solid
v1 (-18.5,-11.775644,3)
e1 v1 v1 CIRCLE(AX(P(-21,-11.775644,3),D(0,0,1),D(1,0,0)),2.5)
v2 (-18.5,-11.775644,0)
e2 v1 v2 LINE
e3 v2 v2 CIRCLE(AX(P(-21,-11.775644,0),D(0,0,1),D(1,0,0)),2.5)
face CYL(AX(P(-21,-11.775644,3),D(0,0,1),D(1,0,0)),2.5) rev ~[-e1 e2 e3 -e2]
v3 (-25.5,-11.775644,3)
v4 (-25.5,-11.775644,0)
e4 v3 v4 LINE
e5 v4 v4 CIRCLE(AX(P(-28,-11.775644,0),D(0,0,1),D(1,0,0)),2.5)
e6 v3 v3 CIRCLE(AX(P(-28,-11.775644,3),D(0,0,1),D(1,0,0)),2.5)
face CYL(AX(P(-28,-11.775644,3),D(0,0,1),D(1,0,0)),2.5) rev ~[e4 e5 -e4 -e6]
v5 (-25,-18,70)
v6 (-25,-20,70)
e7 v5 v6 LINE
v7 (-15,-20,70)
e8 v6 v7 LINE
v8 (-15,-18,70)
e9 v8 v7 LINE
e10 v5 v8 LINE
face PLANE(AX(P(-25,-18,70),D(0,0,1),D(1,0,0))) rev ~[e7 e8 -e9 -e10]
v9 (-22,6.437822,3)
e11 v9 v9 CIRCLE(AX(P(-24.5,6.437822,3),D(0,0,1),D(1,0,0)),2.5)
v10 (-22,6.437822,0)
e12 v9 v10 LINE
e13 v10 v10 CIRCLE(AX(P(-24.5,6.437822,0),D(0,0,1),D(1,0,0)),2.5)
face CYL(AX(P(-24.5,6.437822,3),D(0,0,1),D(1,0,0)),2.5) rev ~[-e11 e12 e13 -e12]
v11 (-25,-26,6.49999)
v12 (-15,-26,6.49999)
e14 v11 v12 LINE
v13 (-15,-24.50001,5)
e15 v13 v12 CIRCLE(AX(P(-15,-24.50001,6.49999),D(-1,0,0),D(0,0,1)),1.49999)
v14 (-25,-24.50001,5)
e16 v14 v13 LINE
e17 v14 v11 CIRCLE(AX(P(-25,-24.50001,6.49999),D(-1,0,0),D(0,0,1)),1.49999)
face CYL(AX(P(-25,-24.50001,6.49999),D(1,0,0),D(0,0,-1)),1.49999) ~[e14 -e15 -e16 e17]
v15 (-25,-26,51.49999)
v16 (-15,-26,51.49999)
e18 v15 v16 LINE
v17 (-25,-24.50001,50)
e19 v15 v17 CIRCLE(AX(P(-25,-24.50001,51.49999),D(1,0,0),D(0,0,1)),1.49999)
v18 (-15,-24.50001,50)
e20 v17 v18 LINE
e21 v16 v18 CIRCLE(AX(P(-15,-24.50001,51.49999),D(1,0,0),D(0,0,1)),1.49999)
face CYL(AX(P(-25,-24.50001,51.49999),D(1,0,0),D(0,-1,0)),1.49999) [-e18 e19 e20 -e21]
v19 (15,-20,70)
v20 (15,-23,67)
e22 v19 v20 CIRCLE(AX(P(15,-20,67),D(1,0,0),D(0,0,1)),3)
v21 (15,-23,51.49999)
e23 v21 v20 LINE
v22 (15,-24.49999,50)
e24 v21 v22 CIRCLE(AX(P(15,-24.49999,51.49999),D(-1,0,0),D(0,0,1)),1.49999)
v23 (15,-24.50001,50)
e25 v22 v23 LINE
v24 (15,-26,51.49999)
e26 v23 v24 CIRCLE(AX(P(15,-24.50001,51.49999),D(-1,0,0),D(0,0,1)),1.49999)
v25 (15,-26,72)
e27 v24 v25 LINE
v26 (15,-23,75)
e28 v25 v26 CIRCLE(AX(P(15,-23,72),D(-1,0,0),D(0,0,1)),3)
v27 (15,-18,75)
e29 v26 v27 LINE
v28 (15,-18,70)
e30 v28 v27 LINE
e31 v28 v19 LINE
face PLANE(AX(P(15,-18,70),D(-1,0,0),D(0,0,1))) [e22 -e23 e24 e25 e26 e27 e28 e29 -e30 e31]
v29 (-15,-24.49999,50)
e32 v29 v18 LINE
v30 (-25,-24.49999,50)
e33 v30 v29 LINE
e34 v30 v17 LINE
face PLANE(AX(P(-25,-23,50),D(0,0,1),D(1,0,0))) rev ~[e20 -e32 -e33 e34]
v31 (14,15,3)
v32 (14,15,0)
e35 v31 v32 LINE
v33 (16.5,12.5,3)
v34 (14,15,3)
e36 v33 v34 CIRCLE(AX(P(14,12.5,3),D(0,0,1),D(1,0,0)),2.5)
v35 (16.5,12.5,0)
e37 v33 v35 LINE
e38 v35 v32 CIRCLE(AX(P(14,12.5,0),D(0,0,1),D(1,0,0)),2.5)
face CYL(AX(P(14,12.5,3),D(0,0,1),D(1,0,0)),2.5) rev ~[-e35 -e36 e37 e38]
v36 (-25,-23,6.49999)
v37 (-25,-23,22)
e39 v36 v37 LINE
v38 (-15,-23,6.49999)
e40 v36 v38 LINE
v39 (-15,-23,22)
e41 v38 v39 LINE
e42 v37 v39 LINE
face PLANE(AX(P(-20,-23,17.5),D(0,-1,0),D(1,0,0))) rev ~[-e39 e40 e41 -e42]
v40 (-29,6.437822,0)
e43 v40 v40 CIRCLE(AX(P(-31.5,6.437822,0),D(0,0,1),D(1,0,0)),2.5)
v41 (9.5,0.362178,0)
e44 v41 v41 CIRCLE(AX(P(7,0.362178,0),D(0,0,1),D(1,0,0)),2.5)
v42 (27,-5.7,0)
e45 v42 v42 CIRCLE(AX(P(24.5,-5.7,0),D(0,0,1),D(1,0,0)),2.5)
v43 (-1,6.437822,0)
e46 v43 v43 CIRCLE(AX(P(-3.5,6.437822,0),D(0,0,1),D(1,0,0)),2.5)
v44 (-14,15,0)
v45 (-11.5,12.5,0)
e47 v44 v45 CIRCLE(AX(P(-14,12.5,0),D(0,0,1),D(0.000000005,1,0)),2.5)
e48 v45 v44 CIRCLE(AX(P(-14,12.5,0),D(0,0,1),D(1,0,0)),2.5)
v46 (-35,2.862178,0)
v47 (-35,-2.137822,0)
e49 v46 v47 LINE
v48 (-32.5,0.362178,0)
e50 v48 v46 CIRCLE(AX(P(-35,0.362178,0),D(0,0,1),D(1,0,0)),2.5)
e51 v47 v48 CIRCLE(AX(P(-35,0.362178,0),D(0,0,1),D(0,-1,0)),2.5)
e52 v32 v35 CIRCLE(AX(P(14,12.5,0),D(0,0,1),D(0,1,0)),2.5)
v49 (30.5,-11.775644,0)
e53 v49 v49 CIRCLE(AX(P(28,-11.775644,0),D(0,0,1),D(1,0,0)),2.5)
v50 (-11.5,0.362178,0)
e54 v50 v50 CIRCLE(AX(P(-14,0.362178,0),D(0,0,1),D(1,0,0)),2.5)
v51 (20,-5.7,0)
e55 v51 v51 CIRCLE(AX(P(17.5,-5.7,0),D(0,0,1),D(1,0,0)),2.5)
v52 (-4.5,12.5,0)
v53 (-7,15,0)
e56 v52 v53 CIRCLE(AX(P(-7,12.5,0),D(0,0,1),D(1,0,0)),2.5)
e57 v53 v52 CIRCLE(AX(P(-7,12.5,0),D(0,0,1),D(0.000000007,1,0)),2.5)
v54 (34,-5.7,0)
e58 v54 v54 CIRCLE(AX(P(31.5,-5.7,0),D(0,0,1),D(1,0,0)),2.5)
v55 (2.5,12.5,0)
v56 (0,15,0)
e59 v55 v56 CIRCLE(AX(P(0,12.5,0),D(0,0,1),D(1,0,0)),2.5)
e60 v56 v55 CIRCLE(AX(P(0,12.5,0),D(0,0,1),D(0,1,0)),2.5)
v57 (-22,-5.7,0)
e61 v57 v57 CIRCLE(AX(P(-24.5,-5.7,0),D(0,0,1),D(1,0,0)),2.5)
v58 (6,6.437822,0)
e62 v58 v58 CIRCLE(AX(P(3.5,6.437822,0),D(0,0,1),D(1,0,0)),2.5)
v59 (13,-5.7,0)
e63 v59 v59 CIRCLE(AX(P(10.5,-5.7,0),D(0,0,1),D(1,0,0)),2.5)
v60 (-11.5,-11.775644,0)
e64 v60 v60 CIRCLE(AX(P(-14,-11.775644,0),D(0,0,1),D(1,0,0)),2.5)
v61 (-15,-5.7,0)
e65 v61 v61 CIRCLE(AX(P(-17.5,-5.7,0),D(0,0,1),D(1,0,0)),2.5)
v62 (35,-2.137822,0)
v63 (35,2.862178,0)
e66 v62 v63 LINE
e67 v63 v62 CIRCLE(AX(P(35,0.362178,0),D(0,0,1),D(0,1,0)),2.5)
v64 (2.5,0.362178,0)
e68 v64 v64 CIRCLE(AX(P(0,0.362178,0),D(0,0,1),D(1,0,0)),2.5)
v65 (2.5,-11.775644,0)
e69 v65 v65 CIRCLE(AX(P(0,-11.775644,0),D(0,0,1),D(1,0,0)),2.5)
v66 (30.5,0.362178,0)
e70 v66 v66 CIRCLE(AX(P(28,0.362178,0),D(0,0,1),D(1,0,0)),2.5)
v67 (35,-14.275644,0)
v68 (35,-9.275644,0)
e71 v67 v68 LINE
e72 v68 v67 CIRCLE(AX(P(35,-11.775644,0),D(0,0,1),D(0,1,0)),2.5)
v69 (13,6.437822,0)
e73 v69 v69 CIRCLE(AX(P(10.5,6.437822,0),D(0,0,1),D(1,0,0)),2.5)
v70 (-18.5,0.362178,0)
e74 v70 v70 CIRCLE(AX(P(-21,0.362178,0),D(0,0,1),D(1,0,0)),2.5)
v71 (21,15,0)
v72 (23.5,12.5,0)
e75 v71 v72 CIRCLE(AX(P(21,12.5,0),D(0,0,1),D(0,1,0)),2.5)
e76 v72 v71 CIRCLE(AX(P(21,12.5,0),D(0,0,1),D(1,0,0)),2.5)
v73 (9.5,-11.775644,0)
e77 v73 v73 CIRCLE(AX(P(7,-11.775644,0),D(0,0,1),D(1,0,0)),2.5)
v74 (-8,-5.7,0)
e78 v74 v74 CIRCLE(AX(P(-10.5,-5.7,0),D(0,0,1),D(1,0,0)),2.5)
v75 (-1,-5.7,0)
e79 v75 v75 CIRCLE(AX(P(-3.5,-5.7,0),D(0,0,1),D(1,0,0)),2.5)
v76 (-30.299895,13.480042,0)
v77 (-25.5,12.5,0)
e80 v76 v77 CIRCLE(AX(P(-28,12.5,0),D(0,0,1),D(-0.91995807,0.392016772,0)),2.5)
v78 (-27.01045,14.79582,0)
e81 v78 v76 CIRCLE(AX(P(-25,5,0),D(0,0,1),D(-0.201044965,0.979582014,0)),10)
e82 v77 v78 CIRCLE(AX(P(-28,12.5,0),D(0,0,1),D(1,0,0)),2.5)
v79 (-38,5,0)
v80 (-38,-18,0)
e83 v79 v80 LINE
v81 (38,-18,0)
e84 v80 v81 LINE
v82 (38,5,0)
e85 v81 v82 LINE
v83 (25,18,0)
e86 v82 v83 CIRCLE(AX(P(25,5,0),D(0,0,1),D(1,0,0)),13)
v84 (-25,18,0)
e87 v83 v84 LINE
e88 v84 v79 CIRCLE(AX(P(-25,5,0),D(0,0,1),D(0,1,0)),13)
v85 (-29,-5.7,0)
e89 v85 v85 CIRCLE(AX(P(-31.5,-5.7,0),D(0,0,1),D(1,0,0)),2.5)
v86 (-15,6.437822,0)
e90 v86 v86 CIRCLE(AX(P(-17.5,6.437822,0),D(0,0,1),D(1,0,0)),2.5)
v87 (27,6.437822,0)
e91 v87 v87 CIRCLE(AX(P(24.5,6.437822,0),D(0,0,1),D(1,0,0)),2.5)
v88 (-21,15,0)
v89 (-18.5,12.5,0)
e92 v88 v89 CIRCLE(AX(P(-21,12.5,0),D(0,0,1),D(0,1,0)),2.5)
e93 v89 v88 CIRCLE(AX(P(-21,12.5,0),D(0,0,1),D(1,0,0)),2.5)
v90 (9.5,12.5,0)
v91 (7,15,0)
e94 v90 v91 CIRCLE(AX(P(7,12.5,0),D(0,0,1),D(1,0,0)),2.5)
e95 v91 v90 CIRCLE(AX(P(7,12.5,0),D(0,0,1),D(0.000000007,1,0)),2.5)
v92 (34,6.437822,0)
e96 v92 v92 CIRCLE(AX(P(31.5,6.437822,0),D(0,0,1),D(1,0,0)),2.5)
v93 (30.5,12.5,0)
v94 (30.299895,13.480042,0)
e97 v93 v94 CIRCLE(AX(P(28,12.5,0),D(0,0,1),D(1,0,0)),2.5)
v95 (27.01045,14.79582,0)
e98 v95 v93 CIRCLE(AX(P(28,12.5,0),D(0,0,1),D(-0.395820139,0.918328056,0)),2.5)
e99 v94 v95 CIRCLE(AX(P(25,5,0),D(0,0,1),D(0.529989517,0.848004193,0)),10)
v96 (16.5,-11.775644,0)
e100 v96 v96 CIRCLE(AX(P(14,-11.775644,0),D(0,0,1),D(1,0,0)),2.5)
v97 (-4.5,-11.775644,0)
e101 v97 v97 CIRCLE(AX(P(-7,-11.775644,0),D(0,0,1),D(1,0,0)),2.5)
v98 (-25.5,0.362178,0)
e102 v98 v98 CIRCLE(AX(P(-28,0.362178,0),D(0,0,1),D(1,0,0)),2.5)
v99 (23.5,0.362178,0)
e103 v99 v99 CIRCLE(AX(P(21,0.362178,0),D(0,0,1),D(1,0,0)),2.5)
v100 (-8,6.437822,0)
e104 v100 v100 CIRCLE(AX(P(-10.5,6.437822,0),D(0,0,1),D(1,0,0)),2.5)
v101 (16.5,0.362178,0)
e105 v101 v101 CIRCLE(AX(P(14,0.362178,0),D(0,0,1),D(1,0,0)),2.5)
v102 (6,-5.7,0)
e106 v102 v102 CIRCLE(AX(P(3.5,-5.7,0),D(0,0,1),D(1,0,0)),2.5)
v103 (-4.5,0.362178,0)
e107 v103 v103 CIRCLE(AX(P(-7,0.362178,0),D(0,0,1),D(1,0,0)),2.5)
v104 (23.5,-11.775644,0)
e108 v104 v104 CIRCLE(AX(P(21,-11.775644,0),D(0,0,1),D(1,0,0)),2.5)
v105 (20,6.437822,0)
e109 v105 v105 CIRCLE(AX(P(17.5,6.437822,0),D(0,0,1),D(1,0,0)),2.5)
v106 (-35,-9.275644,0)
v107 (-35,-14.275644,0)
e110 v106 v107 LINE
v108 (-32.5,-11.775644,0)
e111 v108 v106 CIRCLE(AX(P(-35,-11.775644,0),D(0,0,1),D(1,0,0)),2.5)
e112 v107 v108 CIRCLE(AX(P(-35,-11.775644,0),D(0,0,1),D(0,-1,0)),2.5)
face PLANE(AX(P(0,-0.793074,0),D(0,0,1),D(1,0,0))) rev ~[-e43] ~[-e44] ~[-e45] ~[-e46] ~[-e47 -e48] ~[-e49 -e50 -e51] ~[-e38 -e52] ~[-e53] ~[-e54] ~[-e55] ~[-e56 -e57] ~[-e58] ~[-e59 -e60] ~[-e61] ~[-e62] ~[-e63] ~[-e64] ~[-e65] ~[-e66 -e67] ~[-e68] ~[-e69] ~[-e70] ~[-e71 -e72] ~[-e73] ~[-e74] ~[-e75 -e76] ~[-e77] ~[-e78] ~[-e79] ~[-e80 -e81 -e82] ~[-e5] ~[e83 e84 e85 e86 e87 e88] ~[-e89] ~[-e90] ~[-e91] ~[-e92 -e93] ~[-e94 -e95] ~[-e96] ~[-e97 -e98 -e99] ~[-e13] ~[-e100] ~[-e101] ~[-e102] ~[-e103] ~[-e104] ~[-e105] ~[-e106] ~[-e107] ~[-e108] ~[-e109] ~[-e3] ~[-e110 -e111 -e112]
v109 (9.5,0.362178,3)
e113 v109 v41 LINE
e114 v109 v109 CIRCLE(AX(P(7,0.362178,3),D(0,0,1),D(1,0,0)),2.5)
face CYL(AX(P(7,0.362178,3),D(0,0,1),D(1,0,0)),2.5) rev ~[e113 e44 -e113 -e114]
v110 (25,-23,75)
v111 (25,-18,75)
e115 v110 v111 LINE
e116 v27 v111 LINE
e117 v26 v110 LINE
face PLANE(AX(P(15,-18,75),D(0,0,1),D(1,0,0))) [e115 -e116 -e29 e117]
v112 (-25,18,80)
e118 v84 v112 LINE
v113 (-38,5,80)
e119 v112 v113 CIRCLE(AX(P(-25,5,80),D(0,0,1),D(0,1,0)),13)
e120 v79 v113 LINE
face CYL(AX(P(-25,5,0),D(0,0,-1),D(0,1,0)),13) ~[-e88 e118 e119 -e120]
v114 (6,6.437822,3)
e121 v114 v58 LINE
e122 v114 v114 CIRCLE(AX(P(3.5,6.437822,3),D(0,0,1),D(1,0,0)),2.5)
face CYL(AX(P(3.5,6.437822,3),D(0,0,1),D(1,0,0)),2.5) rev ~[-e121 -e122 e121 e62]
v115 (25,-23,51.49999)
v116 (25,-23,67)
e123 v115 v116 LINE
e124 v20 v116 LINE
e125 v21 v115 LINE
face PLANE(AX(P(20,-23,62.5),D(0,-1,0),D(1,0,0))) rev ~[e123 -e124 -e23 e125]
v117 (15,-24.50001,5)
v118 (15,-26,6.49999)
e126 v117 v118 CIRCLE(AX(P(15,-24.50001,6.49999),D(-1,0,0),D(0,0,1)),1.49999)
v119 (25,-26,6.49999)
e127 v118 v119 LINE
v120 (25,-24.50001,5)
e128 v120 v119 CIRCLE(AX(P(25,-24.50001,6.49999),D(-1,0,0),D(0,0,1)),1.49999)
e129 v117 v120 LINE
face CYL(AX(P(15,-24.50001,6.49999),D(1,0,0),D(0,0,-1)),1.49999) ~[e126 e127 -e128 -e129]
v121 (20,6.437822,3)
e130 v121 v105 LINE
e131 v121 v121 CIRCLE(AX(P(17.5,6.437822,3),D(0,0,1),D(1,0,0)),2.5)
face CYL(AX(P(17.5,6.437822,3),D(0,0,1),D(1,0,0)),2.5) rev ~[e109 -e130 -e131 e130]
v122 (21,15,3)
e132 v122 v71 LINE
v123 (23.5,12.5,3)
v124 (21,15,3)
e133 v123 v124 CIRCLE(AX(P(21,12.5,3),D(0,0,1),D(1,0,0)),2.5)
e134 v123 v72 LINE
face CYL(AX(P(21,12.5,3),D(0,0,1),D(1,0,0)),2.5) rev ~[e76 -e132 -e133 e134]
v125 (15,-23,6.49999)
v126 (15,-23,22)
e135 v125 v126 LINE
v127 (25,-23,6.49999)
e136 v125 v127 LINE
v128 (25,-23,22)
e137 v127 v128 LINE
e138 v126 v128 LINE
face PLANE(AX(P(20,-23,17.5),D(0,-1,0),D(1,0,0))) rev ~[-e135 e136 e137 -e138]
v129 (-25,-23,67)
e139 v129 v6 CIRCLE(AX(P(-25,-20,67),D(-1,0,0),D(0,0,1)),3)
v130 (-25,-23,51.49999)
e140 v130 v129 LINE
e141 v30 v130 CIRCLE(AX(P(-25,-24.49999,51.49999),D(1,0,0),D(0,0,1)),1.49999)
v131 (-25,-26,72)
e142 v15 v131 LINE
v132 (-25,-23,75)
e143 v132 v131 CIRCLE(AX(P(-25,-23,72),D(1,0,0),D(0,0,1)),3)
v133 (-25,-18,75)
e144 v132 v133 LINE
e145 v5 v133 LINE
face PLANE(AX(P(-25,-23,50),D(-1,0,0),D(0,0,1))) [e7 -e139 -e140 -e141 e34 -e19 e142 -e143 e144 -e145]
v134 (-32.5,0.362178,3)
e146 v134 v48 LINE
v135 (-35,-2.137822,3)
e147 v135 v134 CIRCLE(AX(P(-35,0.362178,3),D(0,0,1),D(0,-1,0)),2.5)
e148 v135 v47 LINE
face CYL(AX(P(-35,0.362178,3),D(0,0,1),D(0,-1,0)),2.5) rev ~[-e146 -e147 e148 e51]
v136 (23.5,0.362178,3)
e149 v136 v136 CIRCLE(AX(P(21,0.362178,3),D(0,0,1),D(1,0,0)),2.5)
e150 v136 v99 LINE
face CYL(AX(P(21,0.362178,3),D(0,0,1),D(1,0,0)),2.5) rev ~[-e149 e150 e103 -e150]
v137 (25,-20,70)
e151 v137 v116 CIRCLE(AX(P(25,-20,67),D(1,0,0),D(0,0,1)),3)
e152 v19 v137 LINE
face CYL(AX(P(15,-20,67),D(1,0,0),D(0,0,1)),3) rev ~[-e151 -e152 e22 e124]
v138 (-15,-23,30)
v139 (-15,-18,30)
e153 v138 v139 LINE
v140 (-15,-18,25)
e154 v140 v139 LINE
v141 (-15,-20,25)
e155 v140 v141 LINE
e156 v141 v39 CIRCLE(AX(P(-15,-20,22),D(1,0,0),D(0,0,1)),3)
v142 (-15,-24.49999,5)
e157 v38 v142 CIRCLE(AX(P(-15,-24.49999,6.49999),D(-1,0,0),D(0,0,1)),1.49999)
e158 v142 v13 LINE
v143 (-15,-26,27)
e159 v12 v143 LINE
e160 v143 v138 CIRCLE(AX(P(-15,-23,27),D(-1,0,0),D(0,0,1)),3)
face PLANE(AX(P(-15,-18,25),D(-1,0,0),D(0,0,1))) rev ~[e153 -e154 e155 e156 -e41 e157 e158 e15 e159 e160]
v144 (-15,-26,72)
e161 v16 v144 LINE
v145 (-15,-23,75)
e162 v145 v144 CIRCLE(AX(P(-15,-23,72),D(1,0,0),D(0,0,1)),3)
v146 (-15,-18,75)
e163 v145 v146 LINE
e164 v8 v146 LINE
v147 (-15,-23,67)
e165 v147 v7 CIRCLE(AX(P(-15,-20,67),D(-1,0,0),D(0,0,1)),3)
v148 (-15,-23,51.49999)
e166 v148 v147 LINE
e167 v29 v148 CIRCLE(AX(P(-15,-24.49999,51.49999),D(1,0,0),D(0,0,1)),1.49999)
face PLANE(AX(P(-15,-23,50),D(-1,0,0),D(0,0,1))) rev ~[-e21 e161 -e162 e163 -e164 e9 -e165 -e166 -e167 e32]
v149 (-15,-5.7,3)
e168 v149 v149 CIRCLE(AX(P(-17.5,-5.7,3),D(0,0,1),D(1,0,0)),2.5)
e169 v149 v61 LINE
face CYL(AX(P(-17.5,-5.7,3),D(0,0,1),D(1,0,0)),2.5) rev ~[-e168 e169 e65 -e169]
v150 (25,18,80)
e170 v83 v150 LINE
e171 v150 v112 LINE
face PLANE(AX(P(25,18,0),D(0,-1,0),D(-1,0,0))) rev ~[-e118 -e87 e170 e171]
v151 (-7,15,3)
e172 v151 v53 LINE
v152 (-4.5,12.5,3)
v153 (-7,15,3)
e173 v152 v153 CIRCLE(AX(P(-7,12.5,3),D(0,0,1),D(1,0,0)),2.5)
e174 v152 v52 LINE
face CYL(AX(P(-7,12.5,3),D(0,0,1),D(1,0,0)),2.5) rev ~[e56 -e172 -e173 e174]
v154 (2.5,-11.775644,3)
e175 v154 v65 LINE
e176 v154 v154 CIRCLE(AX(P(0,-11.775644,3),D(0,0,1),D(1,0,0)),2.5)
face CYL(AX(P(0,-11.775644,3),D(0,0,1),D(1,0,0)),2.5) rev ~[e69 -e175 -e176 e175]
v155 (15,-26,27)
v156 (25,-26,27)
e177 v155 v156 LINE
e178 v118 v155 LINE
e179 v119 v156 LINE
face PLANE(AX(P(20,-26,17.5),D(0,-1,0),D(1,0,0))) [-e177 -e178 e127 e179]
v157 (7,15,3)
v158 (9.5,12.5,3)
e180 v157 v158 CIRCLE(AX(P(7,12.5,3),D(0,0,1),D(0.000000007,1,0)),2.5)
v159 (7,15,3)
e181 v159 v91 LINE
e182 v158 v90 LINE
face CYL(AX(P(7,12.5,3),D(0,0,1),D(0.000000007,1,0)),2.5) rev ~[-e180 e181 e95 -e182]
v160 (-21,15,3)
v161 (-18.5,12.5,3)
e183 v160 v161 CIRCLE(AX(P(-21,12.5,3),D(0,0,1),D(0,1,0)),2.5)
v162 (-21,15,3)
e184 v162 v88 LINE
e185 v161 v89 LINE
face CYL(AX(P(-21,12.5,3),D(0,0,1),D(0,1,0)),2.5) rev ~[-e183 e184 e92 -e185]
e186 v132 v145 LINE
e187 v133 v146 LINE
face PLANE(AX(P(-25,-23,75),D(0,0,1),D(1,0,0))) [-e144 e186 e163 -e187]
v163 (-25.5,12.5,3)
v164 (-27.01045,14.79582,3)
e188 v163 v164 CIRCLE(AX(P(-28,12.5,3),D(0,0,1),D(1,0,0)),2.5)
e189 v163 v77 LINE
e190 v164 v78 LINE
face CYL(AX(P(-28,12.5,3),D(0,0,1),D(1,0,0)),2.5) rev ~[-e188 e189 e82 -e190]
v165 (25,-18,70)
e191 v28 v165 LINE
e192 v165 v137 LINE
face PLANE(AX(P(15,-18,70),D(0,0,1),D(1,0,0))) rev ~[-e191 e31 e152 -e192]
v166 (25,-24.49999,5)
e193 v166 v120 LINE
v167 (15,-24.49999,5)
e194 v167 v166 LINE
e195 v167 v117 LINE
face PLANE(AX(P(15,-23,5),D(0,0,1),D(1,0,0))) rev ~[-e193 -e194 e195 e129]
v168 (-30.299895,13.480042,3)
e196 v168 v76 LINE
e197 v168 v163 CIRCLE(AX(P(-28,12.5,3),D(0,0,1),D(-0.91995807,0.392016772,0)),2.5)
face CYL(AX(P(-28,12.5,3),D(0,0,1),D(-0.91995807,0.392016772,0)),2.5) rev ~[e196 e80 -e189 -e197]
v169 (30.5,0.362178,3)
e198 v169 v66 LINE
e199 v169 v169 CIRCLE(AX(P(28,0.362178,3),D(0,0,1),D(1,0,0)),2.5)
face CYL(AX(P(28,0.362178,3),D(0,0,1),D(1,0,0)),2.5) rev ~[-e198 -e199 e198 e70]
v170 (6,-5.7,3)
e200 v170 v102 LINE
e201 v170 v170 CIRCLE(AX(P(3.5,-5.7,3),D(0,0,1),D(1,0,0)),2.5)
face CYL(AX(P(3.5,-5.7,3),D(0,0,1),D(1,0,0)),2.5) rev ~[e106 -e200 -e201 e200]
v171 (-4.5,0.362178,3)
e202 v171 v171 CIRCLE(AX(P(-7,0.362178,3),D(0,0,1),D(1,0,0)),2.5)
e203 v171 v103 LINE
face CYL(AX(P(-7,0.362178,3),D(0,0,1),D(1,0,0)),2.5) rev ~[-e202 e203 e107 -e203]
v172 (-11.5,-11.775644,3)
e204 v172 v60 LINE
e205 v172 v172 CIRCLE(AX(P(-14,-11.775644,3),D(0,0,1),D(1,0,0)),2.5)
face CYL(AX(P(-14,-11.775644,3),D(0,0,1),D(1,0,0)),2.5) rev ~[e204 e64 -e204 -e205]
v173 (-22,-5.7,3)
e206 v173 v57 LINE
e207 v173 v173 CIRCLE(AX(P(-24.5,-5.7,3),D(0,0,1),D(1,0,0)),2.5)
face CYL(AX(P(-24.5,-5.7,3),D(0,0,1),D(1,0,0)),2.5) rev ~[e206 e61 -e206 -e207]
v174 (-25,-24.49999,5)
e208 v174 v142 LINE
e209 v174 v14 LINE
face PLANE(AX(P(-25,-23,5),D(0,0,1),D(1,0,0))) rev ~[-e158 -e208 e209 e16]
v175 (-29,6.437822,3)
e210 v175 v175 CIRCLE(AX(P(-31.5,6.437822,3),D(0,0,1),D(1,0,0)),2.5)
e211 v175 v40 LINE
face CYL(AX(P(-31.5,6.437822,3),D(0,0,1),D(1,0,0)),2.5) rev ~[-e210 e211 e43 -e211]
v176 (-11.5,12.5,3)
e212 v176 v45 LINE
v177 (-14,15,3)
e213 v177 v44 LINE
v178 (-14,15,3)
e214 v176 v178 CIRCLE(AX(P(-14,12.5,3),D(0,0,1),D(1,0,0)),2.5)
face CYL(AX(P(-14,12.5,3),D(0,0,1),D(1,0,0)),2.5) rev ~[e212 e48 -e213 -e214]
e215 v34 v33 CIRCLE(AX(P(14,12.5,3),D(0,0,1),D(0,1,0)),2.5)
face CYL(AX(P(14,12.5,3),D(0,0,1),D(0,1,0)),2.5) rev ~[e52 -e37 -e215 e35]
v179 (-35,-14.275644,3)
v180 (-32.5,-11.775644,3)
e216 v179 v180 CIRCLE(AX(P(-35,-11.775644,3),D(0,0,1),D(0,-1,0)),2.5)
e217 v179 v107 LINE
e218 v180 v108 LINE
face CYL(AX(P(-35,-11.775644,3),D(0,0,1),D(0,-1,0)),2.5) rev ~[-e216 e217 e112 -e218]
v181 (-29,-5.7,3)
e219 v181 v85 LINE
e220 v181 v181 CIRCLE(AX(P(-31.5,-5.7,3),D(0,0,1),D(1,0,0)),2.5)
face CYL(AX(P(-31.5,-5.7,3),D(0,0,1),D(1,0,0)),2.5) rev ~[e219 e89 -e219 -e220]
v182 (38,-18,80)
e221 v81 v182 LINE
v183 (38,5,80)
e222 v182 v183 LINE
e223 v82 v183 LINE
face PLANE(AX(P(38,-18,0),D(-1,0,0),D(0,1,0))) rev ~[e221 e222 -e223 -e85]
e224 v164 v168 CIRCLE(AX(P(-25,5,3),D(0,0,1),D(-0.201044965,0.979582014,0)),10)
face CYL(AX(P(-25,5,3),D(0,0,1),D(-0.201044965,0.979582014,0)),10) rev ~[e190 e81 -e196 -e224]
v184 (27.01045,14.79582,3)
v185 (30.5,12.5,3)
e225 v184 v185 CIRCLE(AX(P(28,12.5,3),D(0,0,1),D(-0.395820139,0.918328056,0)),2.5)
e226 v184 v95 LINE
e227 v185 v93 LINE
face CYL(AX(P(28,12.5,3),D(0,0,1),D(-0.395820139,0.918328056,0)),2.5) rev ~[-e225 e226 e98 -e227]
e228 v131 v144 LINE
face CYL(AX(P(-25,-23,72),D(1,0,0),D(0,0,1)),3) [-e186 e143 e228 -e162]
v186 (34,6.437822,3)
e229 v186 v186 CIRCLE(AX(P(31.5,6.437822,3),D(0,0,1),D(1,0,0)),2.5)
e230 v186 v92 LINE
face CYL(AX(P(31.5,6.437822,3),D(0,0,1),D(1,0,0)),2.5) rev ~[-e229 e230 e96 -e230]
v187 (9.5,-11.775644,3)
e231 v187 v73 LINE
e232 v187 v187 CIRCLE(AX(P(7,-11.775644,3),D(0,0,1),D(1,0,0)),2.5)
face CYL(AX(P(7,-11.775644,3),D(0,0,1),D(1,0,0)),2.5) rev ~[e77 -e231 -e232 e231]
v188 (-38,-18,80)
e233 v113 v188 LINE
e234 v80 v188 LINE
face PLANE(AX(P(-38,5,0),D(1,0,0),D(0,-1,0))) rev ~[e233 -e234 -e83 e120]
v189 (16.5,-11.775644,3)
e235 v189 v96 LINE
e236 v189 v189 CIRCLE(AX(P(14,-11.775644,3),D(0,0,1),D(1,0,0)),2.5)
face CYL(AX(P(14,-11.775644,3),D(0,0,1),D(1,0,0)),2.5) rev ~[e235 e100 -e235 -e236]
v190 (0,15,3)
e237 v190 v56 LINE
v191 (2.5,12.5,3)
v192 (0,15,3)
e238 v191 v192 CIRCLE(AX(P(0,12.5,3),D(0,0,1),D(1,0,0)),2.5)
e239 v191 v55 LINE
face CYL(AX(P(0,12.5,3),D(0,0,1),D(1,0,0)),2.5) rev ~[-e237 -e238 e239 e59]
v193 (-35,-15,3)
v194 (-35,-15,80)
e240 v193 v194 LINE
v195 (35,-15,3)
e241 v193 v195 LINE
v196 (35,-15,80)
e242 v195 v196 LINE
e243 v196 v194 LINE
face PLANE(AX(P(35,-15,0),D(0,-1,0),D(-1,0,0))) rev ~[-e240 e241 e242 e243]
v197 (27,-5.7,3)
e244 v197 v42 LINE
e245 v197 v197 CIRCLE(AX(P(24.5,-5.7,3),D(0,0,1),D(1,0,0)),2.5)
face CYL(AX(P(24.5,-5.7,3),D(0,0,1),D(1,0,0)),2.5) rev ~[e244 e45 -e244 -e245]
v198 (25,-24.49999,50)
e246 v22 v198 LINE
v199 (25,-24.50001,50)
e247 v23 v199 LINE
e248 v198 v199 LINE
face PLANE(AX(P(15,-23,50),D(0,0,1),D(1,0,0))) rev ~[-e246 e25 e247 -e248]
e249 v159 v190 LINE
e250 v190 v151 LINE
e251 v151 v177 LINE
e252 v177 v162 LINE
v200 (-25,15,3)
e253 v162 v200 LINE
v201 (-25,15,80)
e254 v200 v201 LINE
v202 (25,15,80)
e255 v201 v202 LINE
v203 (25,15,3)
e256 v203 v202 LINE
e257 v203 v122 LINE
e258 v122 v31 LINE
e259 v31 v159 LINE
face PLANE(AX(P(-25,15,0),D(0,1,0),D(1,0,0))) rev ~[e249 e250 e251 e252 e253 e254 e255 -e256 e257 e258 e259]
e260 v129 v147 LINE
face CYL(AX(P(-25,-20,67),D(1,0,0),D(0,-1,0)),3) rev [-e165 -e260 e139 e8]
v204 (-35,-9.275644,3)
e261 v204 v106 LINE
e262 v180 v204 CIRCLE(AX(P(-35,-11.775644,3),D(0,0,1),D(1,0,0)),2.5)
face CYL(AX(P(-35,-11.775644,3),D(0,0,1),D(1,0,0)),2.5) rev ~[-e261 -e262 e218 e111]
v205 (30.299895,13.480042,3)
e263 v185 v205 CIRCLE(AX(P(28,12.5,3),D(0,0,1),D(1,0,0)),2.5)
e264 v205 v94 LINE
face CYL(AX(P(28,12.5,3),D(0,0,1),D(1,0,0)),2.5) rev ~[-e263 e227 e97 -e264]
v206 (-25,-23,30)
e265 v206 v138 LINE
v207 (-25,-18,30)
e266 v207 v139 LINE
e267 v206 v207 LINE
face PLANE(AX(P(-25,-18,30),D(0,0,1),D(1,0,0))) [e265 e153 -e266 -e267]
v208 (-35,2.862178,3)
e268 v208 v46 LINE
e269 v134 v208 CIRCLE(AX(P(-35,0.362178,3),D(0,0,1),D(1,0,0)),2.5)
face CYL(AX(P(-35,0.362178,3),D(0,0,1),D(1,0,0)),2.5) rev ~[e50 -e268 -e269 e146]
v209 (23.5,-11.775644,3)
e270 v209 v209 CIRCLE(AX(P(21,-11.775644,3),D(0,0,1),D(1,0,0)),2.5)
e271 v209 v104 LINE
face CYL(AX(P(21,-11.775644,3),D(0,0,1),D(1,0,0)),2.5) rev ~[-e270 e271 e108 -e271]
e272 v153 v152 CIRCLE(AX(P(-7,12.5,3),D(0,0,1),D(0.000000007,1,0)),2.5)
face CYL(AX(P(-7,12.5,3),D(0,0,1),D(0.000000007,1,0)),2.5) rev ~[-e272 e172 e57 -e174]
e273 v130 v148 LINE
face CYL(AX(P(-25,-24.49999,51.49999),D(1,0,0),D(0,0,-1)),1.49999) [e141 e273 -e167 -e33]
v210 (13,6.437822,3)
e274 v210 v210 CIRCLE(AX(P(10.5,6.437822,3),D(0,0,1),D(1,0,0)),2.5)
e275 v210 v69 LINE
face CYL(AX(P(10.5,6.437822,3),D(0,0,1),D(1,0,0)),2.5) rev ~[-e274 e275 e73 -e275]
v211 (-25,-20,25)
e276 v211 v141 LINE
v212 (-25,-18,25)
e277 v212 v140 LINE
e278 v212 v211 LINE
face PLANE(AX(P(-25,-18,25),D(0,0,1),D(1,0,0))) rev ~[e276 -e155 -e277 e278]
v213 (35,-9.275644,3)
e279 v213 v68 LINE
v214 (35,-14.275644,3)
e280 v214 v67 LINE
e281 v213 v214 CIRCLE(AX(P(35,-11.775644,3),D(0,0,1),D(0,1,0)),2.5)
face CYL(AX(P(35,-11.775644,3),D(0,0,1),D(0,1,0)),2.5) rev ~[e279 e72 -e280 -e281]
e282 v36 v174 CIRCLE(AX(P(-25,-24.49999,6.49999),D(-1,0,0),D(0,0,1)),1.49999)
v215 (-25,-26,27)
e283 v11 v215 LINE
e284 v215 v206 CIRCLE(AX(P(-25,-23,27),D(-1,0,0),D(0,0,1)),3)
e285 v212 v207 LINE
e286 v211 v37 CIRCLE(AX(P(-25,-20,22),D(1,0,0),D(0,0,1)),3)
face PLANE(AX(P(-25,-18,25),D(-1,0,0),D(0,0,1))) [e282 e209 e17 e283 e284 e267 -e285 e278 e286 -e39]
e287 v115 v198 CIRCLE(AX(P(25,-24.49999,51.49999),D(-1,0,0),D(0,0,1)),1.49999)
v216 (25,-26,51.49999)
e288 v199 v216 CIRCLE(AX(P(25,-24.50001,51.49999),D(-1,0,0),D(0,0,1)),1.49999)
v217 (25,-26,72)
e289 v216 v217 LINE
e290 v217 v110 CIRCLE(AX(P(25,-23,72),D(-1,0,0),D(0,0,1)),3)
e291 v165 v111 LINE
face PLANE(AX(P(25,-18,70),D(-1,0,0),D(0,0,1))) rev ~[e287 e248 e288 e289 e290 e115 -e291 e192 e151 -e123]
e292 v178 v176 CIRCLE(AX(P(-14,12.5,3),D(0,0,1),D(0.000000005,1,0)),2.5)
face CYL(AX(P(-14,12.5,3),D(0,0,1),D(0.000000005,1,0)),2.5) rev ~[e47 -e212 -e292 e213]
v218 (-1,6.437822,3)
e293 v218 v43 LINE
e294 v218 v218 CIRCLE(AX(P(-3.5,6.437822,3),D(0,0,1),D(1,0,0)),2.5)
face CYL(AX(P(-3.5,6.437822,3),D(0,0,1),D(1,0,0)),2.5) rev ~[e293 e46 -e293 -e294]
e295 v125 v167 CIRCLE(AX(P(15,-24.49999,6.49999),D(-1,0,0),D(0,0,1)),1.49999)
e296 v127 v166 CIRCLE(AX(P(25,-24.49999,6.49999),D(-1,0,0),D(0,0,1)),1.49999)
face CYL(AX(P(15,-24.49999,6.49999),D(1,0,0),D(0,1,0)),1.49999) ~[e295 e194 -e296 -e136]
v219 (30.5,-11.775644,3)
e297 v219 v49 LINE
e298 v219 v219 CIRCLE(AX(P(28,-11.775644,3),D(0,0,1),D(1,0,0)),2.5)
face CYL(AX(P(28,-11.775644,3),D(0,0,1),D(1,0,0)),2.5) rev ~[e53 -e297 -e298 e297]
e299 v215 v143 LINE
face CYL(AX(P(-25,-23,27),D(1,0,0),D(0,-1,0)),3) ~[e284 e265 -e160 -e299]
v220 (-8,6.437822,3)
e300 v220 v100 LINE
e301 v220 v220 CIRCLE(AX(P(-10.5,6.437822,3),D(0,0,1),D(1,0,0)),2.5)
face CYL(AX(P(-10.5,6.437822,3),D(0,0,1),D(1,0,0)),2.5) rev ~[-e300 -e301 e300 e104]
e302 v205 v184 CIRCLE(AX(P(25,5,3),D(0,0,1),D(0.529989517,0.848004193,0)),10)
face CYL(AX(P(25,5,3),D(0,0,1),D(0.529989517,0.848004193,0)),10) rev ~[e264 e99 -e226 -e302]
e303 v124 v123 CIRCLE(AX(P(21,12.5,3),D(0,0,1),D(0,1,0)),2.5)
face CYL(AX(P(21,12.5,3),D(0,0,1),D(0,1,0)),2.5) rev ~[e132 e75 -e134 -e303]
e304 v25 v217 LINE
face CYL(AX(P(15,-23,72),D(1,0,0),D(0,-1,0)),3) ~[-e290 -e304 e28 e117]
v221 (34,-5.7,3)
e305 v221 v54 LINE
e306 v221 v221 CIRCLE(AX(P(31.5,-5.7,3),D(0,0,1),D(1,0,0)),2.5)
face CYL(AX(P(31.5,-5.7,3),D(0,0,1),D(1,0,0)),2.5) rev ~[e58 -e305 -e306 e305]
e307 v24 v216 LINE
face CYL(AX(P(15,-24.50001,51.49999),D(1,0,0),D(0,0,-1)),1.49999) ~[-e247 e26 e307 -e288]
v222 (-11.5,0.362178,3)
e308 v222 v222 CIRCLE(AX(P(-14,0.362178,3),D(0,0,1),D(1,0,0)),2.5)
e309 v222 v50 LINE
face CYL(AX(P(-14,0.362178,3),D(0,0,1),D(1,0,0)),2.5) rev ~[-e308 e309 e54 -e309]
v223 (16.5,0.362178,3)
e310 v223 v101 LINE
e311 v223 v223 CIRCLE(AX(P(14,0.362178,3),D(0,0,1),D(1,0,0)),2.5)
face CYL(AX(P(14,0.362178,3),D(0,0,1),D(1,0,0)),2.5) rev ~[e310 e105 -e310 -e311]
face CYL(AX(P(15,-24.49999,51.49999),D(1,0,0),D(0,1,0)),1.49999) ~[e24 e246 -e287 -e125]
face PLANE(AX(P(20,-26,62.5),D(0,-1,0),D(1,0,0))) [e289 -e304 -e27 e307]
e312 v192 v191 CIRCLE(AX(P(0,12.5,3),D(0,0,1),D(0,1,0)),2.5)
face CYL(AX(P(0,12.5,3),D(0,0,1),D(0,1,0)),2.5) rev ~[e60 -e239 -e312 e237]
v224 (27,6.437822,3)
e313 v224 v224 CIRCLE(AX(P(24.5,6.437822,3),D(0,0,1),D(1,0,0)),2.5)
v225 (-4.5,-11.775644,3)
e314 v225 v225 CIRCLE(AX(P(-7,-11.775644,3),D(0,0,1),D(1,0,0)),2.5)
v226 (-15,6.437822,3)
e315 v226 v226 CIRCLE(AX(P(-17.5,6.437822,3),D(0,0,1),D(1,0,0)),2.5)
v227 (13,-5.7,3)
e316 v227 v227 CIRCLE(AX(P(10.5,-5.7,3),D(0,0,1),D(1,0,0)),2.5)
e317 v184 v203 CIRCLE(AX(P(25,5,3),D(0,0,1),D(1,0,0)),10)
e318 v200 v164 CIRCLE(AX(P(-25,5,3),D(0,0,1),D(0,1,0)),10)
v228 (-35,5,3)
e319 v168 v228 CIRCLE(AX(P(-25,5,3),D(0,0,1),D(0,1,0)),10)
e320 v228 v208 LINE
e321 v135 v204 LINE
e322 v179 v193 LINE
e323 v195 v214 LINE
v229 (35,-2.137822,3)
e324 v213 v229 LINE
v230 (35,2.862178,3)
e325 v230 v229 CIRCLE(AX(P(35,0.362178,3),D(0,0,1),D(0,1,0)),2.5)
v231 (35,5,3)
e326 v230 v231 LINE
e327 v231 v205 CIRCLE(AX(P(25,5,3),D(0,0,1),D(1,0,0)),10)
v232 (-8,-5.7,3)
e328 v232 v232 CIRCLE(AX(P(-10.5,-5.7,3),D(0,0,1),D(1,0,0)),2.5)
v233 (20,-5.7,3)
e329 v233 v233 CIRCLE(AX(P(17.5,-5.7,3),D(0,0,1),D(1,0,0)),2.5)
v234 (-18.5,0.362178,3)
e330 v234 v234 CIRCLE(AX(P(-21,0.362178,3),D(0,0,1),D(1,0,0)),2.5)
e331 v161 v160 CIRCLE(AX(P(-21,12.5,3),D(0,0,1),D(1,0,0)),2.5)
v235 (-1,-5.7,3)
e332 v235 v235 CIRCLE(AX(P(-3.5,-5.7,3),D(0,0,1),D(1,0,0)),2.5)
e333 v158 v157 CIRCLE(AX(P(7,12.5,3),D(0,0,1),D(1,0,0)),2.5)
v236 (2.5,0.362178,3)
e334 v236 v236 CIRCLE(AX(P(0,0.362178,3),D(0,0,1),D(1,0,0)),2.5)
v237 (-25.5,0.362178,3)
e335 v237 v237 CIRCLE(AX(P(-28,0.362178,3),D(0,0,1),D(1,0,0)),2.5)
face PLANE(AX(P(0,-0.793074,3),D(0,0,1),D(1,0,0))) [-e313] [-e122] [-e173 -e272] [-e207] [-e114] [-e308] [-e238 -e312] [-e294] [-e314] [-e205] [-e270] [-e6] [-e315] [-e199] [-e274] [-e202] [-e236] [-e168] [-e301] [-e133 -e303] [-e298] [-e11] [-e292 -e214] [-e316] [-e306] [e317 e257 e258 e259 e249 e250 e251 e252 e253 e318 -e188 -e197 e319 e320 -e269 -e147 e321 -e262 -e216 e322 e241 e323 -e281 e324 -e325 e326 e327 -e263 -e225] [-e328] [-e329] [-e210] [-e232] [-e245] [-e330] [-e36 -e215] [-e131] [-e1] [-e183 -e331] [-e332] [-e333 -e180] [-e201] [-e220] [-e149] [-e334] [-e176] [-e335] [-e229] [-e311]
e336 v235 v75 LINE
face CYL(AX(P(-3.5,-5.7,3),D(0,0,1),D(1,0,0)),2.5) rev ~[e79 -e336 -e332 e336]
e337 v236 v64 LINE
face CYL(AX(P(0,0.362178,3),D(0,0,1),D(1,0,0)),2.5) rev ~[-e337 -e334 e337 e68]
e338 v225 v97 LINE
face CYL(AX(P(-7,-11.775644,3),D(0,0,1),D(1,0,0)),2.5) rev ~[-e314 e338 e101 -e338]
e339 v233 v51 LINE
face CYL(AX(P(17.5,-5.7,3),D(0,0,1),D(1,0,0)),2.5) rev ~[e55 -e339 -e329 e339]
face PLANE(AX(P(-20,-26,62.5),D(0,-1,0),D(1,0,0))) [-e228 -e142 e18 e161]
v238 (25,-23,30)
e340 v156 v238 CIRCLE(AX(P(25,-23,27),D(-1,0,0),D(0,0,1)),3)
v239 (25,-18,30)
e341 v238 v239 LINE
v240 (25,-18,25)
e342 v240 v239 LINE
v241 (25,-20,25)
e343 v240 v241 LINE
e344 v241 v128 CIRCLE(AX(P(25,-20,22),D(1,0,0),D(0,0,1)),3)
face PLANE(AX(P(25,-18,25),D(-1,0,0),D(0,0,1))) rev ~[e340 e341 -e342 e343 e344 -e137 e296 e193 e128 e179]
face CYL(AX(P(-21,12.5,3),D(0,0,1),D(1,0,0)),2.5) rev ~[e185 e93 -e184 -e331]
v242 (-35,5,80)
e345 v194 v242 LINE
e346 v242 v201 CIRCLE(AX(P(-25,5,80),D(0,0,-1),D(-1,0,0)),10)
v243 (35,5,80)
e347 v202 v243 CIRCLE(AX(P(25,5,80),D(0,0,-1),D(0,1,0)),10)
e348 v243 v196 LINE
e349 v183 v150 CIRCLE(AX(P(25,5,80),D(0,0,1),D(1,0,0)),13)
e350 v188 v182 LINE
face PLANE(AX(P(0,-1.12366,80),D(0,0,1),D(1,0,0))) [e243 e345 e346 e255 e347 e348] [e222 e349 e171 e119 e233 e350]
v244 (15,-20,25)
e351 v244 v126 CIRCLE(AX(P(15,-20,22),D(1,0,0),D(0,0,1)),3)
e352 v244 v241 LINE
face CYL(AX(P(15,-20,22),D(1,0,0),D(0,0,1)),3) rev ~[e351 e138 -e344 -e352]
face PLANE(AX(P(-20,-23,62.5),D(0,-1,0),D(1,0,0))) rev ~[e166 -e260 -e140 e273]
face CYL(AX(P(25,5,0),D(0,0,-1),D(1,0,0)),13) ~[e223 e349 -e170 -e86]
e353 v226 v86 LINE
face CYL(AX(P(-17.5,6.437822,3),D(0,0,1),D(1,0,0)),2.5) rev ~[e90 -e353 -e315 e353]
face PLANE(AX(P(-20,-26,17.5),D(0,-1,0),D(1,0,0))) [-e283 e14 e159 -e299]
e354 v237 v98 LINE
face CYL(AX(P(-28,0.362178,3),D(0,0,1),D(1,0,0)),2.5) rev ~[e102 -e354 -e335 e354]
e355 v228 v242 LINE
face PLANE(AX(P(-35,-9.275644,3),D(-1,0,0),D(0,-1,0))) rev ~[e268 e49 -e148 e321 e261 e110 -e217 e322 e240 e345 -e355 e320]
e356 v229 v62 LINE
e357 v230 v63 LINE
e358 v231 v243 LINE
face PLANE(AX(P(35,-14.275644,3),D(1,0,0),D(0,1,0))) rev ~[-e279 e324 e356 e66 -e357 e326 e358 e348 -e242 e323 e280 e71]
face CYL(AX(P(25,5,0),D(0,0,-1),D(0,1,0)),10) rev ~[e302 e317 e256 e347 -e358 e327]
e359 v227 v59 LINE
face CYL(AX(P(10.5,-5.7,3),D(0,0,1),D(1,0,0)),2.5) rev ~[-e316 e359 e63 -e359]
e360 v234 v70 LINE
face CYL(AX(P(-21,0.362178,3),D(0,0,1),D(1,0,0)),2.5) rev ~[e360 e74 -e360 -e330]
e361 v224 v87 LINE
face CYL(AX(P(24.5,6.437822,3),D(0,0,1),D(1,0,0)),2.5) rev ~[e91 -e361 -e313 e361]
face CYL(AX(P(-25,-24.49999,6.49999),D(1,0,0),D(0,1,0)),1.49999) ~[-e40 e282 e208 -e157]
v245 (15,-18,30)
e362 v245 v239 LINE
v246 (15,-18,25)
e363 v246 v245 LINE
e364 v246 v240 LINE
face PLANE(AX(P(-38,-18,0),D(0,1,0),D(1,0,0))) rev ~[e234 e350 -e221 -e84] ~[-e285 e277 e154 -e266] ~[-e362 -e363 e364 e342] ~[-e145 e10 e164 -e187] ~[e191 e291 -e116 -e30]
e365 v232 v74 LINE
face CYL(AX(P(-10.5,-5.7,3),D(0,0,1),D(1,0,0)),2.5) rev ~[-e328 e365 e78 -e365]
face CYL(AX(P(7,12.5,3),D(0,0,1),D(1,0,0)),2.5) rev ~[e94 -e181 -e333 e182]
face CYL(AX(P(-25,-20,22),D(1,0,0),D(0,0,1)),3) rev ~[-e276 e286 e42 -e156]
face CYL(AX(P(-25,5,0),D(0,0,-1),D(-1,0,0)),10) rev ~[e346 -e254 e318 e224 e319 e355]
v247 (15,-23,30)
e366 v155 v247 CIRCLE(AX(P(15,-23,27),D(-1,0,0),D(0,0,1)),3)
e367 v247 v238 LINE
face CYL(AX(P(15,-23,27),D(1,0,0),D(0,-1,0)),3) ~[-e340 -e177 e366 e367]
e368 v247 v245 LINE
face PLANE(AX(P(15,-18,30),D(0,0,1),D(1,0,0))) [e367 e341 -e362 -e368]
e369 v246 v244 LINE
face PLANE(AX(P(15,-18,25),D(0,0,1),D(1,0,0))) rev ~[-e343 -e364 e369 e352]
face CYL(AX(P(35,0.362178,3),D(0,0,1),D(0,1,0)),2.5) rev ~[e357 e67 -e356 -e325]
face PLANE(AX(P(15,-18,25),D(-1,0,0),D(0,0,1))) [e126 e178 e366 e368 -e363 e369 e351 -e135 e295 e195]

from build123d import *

# Parameters (mm, degrees)
F1_DEPTH = 80
F2_DEPTH = 3
F3_R     = 2.5
F4_DEPTH = 3
F5_W     = 10
F5_H     = 5
F6_DEPTH = 5
F7_W     = 10
F7_H     = 25
F8_DEPTH = 3
F9_R     = 3
F10_R    = 1.49999


# Not quite as in the source:
# - a fillet or chamfer is up to 0.001 mm smaller than in the source, because OpenCascade refuses the exact size


with BuildPart() as f1:
    # F0 (on Top) → F1 (new body)
    with BuildSketch(Plane.XY):
        with BuildLine():
            Line((-38, 5), (-38, -18))
            Line((-38, -18), (38, -18))
            Line((38, -18), (38, 5))
            ThreePointArc((38, 5), (34.1923881554, 14.1923881554), (25, 18))
            Line((25, 18), (-25, 18))
            ThreePointArc((-25, 18), (-34.1923881554, 14.1923881554), (-38, 5))
        make_face()
        with BuildLine():
            Line((35, -15), (-35, -15))
            Line((-35, -15), (-35, 5))
            ThreePointArc((-35, 5), (-32.0710678119, 12.0710678119), (-25, 15))
            Line((-25, 15), (25, 15))
            ThreePointArc((25, 15), (32.0710678119, 12.0710678119), (35, 5))
            Line((35, 5), (35, -15))
        make_face(mode=Mode.SUBTRACT)
    extrude(amount=F1_DEPTH)

    # F0 (on Top) → F2 (join)
    with BuildSketch(Plane.XY):
        with BuildLine():
            Line((-35, 5), (-35, -15))
            Line((-35, -15), (35, -15))
            Line((35, -15), (35, 5))
            ThreePointArc((35, 5), (32.0710678119, 12.0710678119), (25, 15))
            Line((25, 15), (-25, 15))
            ThreePointArc((-25, 15), (-32.0710678119, 12.0710678119), (-35, 5))
        make_face()
    extrude(amount=F2_DEPTH)

    # F3 (on face) → F4 (cut)
    with BuildSketch(Plane.XY.offset(3)):
        with BuildLine():
            ThreePointArc((-30.2998951749, 13.4800419301), (-28.5001310143, 10.050537004), (-25.5, 12.5))
            ThreePointArc((-25.5, 12.5), (-25.9114746987, 13.8740677079), (-27.0104496527, 14.7958201389))
            ThreePointArc((-27.0104496527, 14.7958201389), (-28.7139067635, 14.2847669089), (-30.2998951749, 13.4800419301))
        make_face()
        with BuildLine():
            ThreePointArc((23.5, 12.5), (22.767766953, 14.267766953), (21, 15))
            ThreePointArc((21, 15), (19.232233047, 10.732233047), (23.5, 12.5))
        make_face()
        with BuildLine():
            ThreePointArc((16.5, 12.5), (15.767766953, 14.267766953), (14, 15))
            ThreePointArc((14, 15), (12.232233047, 10.732233047), (16.5, 12.5))
        make_face()
        with BuildLine():
            ThreePointArc((9.5, 12.5), (8.7677669588, 14.2677669471), (7.0000000165, 15))
            ThreePointArc((7.0000000165, 15), (5.2322330412, 10.7322330529), (9.5, 12.5))
        make_face()
        with BuildLine():
            ThreePointArc((2.5, 12.5), (1.7677669531, 14.2677669529), (3e-10, 15))
            ThreePointArc((3e-10, 15), (-1.7677669531, 10.7322330471), (2.5, 12.5))
        make_face()
        with BuildLine():
            ThreePointArc((-4.5, 12.5), (-5.2322330412, 14.2677669471), (-6.9999999835, 15))
            ThreePointArc((-6.9999999835, 15), (-8.7677669588, 10.7322330529), (-4.5, 12.5))
        make_face()
        with BuildLine():
            ThreePointArc((-11.5, 12.5), (-12.2322330423, 14.2677669482), (-13.9999999867, 15))
            ThreePointArc((-13.9999999867, 15), (-15.7677669577, 10.7322330518), (-11.5, 12.5))
        make_face()
        with BuildLine():
            ThreePointArc((-18.5, 12.5), (-19.232233047, 14.267766953), (-21, 15))
            ThreePointArc((-21, 15), (-22.767766953, 10.732233047), (-18.5, 12.5))
        make_face()
        with BuildLine():
            ThreePointArc((-32.5, 0.3621778265), (-33.232233047, 2.1299447795), (-35, 2.8621778265))
            Line((-35, 2.8621778265), (-35, -2.1378221735))
            ThreePointArc((-35, -2.1378221735), (-33.232233047, -1.4055891265), (-32.5, 0.3621778265))
        make_face()
        with BuildLine():
            ThreePointArc((-32.5, -11.775644347), (-33.232233047, -10.0078773941), (-35, -9.275644347))
            Line((-35, -9.275644347), (-35, -14.275644347))
            ThreePointArc((-35, -14.275644347), (-33.232233047, -13.5434113), (-32.5, -11.775644347))
        make_face()
        with BuildLine():
            ThreePointArc((35, -9.275644347), (32.5, -11.775644347), (35, -14.275644347))
            Line((35, -14.275644347), (35, -9.275644347))
        make_face()
        with BuildLine():
            ThreePointArc((30.2998951749, 13.4800419301), (28.7139067635, 14.2847669089), (27.0104496527, 14.7958201389))
            ThreePointArc((27.0104496527, 14.7958201389), (26.6259322921, 10.4114746987), (30.5, 12.5))
            ThreePointArc((30.5, 12.5), (30.449462996, 13.0001310143), (30.2998951749, 13.4800419301))
        make_face()
        with BuildLine():
            ThreePointArc((35, 2.8621778265), (32.5, 0.3621778265), (35, -2.1378221735))
            Line((35, -2.1378221735), (35, 2.8621778265))
        make_face()
        with Locations((10.5, 6.4378221735)):
            Circle(F3_R)
        with Locations((-24.5, 6.4378221735)):
            Circle(F3_R)
        with Locations((-3.5, 6.4378221735)):
            Circle(F3_R)
        with Locations((24.5, 6.4378221735)):
            Circle(F3_R)
        with Locations((-17.5, 6.4378221735)):
            Circle(F3_R)
        with Locations((17.5, 6.4378221735)):
            Circle(F3_R)
        with Locations((3.5, 6.4378221735)):
            Circle(F3_R)
        with Locations((-31.5, 6.4378221735)):
            Circle(F3_R)
        with Locations((31.5, 6.4378221735)):
            Circle(F3_R)
        with Locations((-10.5, 6.4378221735)):
            Circle(F3_R)
        with Locations((31.5, -5.7)):
            Circle(F3_R)
        with Locations((28, 0.3621778265)):
            Circle(F3_R)
        with Locations((-14, 0.3621778265)):
            Circle(F3_R)
        with Locations((-31.5, -5.7)):
            Circle(F3_R)
        with Locations((-7, 0.3621778265)):
            Circle(F3_R)
        with Locations((0, 0.3621778265)):
            Circle(F3_R)
        with Locations((10.5, -5.7)):
            Circle(F3_R)
        with Locations((-21, 0.3621778265)):
            Circle(F3_R)
        with Locations((-28, 0.3621778265)):
            Circle(F3_R)
        with Locations((-10.5, -5.7)):
            Circle(F3_R)
        with Locations((17.5, -5.7)):
            Circle(F3_R)
        with Locations((-24.5, -5.7)):
            Circle(F3_R)
        with Locations((7, 0.3621778265)):
            Circle(F3_R)
        with Locations((-3.5, -5.7)):
            Circle(F3_R)
        with Locations((24.5, -5.7)):
            Circle(F3_R)
        with Locations((14, 0.3621778265)):
            Circle(F3_R)
        with Locations((21, 0.3621778265)):
            Circle(F3_R)
        with Locations((3.5, -5.7)):
            Circle(F3_R)
        with Locations((-17.5, -5.7)):
            Circle(F3_R)
        with Locations((28, -11.775644347)):
            Circle(F3_R)
        with Locations((-14, -11.775644347)):
            Circle(F3_R)
        with Locations((-7, -11.775644347)):
            Circle(F3_R)
        with Locations((0, -11.775644347)):
            Circle(F3_R)
        with Locations((-21, -11.775644347)):
            Circle(F3_R)
        with Locations((-28, -11.775644347)):
            Circle(F3_R)
        with Locations((7, -11.775644347)):
            Circle(F3_R)
        with Locations((14, -11.775644347)):
            Circle(F3_R)
        with Locations((21, -11.775644347)):
            Circle(F3_R)
    extrude(amount=-F4_DEPTH, mode=Mode.SUBTRACT)

    # F5 (on face) → F6 (join)
    with BuildSketch(Plane.XZ.offset(18)):
        with Locations((-20, 72.5)):
            Rectangle(F5_W, F5_H)
        with Locations((20, 72.5)):
            Rectangle(F5_W, F5_H)
        with Locations((20, 27.5)):
            Rectangle(F5_W, F5_H)
        with Locations((-20, 27.5)):
            Rectangle(F5_W, F5_H)
    extrude(amount=F6_DEPTH)

    # F7 (on face) → F8 (join)
    with BuildSketch(Plane.XZ.offset(23)):
        with Locations((-20, 62.5)):
            Rectangle(F7_W, F7_H)
        with Locations((20, 62.5)):
            Rectangle(F7_W, F7_H)
        with Locations((20, 17.5)):
            Rectangle(F7_W, F7_H)
        with Locations((-20, 17.5)):
            Rectangle(F7_W, F7_H)
    extrude(amount=F8_DEPTH)

    # F9
    f9_edges = [f1.edges().sort_by_distance(p)[0] for p in [
        (-20, -26, 30),
        (20, -26, 30),
        (-20, -26, 75),
        (20, -26, 75),
        (20, -23, 25),
        (20, -23, 70),
        (-20, -23, 70),
        (-20, -23, 25),
    ]]
    fillet(f9_edges, radius=F9_R)

    # F10 (radius 1.5 in the source; OpenCascade refuses exactly that, so slightly less here)
    f10_edges = [f1.edges().sort_by_distance(p)[0] for p in [
        (20, -26, 50),
        (20, -23, 50),
        (20, -23, 5),
        (-20, -26, 50),
        (-20, -23, 50),
        (-20, -23, 5),
        (-20, -26, 5),
        (20, -26, 5),
    ]]
    fillet(f10_edges, radius=F10_R)


solid = f1.part
